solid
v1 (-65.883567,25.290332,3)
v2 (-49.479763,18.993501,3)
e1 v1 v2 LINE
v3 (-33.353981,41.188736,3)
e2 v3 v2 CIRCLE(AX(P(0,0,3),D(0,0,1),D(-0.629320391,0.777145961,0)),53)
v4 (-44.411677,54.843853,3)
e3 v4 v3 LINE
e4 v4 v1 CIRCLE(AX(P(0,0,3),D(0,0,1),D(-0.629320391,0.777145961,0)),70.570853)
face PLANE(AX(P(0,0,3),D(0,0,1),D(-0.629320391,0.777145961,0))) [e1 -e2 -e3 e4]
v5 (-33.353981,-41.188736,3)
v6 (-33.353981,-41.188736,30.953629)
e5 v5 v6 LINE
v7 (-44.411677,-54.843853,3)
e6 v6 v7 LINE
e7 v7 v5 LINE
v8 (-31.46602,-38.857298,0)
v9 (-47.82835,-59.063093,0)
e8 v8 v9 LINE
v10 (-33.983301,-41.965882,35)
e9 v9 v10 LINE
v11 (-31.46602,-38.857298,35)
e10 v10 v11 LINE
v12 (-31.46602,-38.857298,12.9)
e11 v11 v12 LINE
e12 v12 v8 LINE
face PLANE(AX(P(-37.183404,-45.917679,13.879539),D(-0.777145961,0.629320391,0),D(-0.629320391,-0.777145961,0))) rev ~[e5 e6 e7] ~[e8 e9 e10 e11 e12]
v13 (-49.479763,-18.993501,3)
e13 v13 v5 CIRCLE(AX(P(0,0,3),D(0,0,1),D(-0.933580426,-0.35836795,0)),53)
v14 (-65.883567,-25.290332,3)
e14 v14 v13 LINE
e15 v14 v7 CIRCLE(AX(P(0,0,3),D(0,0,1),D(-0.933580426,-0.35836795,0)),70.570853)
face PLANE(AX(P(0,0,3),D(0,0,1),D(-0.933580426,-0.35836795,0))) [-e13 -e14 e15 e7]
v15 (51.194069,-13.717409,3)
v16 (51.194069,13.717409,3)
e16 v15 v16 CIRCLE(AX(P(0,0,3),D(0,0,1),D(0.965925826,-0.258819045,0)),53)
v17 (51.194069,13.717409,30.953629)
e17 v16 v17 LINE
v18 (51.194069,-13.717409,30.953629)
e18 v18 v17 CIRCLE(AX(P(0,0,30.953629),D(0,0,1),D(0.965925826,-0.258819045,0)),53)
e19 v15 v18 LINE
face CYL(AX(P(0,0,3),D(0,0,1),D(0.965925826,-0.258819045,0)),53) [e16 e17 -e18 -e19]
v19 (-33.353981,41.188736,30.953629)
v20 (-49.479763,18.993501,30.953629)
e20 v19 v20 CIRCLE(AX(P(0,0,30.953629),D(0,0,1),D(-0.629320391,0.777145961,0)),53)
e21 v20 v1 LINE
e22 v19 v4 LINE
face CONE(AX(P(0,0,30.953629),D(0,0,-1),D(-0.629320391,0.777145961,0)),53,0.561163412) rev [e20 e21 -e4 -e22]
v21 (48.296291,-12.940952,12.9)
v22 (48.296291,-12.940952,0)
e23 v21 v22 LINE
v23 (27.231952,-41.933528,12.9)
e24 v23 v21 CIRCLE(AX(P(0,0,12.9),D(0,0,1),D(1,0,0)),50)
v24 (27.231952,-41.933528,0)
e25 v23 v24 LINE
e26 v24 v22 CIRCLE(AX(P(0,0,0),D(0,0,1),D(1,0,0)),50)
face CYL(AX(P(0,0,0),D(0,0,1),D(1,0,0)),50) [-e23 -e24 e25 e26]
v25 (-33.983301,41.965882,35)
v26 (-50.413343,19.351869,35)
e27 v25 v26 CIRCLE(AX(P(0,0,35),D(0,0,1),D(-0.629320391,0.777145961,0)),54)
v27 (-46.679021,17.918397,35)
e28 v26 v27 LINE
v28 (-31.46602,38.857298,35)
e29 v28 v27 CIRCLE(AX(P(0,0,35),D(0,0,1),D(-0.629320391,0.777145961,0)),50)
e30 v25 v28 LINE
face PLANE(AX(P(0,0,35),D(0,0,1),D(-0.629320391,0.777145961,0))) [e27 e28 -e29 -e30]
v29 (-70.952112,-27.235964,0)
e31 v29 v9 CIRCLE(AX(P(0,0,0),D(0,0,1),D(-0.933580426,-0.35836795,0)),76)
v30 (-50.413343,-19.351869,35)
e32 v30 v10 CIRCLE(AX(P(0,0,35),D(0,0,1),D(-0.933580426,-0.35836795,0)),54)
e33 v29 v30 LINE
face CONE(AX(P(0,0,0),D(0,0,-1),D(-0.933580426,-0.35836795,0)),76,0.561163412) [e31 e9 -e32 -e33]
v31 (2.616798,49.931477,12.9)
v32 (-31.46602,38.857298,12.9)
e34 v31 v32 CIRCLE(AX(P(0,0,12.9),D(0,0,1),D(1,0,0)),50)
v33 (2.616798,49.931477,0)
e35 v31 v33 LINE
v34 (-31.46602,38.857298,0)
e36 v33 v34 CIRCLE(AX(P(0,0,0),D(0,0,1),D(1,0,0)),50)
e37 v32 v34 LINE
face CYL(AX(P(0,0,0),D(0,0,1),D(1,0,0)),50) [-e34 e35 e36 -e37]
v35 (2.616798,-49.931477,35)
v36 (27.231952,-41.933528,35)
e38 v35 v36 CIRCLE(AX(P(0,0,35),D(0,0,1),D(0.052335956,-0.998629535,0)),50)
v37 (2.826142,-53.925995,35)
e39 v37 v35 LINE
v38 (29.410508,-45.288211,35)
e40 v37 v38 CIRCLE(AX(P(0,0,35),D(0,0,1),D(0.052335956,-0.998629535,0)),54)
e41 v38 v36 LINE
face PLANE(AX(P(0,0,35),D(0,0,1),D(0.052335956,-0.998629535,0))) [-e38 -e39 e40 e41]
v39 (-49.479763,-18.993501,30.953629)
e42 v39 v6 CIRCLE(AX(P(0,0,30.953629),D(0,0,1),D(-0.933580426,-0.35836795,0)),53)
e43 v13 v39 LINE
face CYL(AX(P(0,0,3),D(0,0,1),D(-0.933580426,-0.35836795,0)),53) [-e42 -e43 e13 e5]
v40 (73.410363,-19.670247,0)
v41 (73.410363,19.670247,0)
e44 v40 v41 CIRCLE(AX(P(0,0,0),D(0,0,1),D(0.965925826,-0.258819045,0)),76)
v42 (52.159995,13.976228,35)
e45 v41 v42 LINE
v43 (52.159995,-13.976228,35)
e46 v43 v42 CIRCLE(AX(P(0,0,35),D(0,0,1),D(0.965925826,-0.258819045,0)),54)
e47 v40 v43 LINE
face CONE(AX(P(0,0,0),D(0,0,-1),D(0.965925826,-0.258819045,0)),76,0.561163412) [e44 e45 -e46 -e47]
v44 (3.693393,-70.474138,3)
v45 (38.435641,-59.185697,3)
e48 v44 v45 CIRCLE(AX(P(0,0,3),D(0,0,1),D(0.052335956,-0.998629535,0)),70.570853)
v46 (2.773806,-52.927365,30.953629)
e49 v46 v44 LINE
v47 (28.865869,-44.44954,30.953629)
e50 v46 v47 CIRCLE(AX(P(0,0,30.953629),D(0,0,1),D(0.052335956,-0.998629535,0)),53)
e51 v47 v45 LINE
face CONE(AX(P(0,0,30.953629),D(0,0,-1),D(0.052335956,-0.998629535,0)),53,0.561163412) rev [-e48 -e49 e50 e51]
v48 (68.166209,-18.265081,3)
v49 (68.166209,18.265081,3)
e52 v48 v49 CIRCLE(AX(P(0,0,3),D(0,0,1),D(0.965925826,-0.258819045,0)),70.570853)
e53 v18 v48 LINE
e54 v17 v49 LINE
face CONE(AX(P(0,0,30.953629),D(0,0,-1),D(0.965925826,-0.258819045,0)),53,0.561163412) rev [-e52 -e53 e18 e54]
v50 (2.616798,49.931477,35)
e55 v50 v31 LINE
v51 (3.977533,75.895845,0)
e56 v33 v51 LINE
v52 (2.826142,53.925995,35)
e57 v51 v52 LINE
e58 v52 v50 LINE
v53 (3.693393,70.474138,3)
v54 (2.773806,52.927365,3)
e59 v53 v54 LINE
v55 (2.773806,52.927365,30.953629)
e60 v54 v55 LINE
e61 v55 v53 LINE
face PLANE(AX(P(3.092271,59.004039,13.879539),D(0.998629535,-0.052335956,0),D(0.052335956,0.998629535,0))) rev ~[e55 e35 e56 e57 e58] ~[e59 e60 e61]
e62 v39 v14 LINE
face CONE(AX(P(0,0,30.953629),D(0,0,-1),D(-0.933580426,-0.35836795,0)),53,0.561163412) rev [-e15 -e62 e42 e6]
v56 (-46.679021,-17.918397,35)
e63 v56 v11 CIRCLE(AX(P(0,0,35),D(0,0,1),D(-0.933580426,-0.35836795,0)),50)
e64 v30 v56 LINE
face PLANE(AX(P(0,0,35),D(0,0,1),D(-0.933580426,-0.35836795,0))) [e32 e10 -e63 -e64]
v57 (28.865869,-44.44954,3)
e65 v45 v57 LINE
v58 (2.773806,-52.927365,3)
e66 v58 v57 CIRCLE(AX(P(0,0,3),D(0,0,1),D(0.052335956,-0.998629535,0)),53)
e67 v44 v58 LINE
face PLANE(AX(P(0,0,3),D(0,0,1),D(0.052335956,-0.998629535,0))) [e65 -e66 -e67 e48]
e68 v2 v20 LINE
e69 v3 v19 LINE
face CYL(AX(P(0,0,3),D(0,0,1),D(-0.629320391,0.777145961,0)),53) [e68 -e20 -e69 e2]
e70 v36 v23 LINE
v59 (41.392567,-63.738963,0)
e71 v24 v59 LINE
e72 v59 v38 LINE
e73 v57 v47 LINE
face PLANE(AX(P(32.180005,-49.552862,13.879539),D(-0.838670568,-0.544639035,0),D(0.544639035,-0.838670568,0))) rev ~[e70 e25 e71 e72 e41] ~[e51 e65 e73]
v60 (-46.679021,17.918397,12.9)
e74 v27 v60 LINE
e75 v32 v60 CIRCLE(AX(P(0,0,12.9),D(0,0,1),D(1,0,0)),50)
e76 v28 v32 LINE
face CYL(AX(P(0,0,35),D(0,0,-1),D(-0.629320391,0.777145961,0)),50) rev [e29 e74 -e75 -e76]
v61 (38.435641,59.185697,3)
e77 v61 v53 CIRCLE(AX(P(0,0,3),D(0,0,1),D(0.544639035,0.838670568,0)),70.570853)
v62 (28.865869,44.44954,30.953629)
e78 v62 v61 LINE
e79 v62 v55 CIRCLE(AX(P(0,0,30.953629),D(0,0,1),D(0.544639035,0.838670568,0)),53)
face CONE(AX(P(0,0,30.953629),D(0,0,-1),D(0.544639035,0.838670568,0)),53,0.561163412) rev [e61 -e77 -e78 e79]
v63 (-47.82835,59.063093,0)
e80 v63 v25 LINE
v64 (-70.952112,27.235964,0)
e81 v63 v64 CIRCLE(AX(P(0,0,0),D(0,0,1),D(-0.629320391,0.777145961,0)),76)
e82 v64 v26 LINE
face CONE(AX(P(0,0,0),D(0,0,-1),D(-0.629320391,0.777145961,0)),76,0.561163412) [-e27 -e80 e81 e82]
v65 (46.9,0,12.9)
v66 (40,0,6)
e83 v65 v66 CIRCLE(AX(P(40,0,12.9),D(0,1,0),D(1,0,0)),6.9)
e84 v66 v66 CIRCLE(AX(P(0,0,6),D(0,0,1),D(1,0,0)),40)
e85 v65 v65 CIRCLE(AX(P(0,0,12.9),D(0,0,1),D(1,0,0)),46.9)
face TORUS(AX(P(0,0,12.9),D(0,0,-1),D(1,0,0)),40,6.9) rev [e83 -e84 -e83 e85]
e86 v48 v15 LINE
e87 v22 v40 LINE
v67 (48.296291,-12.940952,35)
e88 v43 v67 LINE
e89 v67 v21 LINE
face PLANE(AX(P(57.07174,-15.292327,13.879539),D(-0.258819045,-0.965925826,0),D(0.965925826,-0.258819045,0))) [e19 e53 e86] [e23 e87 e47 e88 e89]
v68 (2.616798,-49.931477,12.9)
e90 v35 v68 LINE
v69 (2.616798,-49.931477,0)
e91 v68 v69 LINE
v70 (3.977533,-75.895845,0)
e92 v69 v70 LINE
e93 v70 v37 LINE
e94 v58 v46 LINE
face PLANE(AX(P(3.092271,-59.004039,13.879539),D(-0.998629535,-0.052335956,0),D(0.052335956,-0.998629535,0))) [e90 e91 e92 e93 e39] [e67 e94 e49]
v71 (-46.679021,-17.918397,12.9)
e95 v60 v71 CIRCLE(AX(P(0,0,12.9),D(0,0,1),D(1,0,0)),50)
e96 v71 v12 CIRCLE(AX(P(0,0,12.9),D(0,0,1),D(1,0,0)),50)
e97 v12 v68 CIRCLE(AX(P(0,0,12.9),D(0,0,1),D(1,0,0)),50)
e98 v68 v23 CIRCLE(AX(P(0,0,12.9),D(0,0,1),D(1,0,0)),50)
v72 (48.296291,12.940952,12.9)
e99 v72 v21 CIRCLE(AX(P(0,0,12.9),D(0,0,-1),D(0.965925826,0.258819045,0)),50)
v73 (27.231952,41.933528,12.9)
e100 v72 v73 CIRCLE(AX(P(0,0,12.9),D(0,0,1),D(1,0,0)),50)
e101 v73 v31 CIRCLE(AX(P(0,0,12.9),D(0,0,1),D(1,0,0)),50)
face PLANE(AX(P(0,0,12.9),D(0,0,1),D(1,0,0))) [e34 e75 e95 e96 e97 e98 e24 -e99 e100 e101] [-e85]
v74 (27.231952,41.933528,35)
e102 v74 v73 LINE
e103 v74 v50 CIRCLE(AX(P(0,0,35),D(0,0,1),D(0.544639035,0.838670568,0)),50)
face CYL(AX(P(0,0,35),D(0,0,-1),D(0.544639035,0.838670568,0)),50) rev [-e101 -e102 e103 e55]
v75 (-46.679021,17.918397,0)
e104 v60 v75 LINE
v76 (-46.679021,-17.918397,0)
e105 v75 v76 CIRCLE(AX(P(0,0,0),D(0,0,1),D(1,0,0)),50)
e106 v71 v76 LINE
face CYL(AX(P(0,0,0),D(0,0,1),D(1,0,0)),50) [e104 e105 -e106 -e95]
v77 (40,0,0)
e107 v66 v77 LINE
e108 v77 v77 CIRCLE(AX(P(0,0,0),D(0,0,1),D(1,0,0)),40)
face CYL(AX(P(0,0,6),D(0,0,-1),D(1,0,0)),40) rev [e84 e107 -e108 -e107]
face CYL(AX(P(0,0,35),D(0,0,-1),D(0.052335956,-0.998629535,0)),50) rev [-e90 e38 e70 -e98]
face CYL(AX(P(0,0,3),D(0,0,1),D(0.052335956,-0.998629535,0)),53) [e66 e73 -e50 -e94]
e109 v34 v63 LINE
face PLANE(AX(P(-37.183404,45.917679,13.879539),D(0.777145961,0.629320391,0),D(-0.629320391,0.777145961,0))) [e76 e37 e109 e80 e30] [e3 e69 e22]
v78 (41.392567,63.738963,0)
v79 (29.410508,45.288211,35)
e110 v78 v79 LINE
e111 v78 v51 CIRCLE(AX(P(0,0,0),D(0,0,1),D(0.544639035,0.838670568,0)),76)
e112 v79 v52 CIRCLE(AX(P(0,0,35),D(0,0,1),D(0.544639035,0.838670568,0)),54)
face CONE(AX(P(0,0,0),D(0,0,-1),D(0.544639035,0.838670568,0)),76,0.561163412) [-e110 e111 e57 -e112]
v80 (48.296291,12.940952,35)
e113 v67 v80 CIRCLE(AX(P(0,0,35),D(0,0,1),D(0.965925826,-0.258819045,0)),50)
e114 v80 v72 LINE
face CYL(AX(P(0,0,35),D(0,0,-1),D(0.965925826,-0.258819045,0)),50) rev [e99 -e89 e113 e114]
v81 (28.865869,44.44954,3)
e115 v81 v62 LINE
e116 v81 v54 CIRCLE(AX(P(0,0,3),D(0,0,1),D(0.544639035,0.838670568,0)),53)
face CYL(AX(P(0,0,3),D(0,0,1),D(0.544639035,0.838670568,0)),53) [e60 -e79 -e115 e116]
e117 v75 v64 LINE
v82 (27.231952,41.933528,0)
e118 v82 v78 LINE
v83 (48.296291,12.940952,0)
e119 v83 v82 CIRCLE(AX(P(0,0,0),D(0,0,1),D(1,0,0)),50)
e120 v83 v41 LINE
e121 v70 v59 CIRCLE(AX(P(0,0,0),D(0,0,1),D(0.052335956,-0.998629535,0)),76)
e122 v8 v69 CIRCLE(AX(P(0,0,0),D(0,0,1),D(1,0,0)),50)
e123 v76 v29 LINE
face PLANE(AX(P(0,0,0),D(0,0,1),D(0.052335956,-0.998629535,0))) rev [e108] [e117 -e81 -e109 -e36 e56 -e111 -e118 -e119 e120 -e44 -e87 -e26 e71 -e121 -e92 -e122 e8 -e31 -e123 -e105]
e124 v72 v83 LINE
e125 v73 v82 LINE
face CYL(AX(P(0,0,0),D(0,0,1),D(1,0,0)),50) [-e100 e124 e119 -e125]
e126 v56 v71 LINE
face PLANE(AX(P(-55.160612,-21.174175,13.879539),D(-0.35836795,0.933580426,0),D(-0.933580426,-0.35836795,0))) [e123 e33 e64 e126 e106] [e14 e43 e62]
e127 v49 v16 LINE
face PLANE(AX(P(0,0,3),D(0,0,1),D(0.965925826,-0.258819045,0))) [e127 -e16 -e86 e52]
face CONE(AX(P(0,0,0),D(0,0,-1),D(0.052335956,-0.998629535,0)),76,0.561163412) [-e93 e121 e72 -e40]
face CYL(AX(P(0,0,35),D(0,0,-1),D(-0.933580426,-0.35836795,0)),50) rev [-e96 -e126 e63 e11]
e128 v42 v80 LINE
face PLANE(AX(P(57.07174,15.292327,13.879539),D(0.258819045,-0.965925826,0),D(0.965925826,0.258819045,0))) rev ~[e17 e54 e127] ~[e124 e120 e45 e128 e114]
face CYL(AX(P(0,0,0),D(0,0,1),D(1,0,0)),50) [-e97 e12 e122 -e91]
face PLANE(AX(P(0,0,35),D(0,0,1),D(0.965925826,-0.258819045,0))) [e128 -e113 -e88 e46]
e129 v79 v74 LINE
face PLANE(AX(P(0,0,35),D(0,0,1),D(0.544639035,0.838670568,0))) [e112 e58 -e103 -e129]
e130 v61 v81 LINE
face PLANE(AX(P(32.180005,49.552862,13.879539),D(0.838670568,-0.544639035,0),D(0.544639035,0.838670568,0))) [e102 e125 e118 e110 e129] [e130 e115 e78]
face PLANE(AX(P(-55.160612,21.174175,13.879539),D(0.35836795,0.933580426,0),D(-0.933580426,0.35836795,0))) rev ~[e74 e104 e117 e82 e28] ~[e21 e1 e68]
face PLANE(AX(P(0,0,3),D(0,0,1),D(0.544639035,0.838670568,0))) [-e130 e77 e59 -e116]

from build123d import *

# Parameters (mm, degrees)
F4_ANGLE_BACK   = 15
F4_ANGLE        = 30
F4_COPIES_COUNT = 5


# Not quite as in the source:
# - a pattern or mirror of a feature is missing from the dataset's text; its kind, count and spacing are read off the source's solid


with BuildPart() as f2:
    # F1 (on Front) → F2 (revolve)
    with BuildSketch(Plane.XZ):
        with BuildLine():
            Line((40, 6), (40, 0))
            Line((40, 0), (50, 0))
            Line((50, 0), (50, 12.9))
            Line((50, 12.9), (46.9, 12.9))
            ThreePointArc((46.9, 12.9), (44.8790367902, 8.0209632098), (40, 6))
        make_face()
    revolve(axis=Axis((0, 0, 7.8032705933), (0, 0, 1)))

    # F3 (on Front) → F4 (revolve)
    with BuildSketch(Plane.XZ, mode=Mode.PRIVATE) as f4_sk:
        Polygon((50, 35), (50, 0), (76, 0), (54, 35), align=None)
        Polygon((53, 30.9536291067), (70.5708525814, 3), (53, 3), align=None, mode=Mode.SUBTRACT)
    f4 = revolve(f4_sk.sketch.rotate(Axis((0, 0, 7.8032705933), (0, 0, 1)), -F4_ANGLE_BACK), axis=Axis((0, 0, 7.8032705933), (0, 0, 1)), revolution_arc=F4_ANGLE)

    # F4_copies: F4 ×5 about axis
    f4_copies_axis = Axis((0, 0, 0), (0, 0, 1))
    for i in range(1, F4_COPIES_COUNT):
        add(f4.rotate(f4_copies_axis, i * 360 / F4_COPIES_COUNT))


solid = f2.part
